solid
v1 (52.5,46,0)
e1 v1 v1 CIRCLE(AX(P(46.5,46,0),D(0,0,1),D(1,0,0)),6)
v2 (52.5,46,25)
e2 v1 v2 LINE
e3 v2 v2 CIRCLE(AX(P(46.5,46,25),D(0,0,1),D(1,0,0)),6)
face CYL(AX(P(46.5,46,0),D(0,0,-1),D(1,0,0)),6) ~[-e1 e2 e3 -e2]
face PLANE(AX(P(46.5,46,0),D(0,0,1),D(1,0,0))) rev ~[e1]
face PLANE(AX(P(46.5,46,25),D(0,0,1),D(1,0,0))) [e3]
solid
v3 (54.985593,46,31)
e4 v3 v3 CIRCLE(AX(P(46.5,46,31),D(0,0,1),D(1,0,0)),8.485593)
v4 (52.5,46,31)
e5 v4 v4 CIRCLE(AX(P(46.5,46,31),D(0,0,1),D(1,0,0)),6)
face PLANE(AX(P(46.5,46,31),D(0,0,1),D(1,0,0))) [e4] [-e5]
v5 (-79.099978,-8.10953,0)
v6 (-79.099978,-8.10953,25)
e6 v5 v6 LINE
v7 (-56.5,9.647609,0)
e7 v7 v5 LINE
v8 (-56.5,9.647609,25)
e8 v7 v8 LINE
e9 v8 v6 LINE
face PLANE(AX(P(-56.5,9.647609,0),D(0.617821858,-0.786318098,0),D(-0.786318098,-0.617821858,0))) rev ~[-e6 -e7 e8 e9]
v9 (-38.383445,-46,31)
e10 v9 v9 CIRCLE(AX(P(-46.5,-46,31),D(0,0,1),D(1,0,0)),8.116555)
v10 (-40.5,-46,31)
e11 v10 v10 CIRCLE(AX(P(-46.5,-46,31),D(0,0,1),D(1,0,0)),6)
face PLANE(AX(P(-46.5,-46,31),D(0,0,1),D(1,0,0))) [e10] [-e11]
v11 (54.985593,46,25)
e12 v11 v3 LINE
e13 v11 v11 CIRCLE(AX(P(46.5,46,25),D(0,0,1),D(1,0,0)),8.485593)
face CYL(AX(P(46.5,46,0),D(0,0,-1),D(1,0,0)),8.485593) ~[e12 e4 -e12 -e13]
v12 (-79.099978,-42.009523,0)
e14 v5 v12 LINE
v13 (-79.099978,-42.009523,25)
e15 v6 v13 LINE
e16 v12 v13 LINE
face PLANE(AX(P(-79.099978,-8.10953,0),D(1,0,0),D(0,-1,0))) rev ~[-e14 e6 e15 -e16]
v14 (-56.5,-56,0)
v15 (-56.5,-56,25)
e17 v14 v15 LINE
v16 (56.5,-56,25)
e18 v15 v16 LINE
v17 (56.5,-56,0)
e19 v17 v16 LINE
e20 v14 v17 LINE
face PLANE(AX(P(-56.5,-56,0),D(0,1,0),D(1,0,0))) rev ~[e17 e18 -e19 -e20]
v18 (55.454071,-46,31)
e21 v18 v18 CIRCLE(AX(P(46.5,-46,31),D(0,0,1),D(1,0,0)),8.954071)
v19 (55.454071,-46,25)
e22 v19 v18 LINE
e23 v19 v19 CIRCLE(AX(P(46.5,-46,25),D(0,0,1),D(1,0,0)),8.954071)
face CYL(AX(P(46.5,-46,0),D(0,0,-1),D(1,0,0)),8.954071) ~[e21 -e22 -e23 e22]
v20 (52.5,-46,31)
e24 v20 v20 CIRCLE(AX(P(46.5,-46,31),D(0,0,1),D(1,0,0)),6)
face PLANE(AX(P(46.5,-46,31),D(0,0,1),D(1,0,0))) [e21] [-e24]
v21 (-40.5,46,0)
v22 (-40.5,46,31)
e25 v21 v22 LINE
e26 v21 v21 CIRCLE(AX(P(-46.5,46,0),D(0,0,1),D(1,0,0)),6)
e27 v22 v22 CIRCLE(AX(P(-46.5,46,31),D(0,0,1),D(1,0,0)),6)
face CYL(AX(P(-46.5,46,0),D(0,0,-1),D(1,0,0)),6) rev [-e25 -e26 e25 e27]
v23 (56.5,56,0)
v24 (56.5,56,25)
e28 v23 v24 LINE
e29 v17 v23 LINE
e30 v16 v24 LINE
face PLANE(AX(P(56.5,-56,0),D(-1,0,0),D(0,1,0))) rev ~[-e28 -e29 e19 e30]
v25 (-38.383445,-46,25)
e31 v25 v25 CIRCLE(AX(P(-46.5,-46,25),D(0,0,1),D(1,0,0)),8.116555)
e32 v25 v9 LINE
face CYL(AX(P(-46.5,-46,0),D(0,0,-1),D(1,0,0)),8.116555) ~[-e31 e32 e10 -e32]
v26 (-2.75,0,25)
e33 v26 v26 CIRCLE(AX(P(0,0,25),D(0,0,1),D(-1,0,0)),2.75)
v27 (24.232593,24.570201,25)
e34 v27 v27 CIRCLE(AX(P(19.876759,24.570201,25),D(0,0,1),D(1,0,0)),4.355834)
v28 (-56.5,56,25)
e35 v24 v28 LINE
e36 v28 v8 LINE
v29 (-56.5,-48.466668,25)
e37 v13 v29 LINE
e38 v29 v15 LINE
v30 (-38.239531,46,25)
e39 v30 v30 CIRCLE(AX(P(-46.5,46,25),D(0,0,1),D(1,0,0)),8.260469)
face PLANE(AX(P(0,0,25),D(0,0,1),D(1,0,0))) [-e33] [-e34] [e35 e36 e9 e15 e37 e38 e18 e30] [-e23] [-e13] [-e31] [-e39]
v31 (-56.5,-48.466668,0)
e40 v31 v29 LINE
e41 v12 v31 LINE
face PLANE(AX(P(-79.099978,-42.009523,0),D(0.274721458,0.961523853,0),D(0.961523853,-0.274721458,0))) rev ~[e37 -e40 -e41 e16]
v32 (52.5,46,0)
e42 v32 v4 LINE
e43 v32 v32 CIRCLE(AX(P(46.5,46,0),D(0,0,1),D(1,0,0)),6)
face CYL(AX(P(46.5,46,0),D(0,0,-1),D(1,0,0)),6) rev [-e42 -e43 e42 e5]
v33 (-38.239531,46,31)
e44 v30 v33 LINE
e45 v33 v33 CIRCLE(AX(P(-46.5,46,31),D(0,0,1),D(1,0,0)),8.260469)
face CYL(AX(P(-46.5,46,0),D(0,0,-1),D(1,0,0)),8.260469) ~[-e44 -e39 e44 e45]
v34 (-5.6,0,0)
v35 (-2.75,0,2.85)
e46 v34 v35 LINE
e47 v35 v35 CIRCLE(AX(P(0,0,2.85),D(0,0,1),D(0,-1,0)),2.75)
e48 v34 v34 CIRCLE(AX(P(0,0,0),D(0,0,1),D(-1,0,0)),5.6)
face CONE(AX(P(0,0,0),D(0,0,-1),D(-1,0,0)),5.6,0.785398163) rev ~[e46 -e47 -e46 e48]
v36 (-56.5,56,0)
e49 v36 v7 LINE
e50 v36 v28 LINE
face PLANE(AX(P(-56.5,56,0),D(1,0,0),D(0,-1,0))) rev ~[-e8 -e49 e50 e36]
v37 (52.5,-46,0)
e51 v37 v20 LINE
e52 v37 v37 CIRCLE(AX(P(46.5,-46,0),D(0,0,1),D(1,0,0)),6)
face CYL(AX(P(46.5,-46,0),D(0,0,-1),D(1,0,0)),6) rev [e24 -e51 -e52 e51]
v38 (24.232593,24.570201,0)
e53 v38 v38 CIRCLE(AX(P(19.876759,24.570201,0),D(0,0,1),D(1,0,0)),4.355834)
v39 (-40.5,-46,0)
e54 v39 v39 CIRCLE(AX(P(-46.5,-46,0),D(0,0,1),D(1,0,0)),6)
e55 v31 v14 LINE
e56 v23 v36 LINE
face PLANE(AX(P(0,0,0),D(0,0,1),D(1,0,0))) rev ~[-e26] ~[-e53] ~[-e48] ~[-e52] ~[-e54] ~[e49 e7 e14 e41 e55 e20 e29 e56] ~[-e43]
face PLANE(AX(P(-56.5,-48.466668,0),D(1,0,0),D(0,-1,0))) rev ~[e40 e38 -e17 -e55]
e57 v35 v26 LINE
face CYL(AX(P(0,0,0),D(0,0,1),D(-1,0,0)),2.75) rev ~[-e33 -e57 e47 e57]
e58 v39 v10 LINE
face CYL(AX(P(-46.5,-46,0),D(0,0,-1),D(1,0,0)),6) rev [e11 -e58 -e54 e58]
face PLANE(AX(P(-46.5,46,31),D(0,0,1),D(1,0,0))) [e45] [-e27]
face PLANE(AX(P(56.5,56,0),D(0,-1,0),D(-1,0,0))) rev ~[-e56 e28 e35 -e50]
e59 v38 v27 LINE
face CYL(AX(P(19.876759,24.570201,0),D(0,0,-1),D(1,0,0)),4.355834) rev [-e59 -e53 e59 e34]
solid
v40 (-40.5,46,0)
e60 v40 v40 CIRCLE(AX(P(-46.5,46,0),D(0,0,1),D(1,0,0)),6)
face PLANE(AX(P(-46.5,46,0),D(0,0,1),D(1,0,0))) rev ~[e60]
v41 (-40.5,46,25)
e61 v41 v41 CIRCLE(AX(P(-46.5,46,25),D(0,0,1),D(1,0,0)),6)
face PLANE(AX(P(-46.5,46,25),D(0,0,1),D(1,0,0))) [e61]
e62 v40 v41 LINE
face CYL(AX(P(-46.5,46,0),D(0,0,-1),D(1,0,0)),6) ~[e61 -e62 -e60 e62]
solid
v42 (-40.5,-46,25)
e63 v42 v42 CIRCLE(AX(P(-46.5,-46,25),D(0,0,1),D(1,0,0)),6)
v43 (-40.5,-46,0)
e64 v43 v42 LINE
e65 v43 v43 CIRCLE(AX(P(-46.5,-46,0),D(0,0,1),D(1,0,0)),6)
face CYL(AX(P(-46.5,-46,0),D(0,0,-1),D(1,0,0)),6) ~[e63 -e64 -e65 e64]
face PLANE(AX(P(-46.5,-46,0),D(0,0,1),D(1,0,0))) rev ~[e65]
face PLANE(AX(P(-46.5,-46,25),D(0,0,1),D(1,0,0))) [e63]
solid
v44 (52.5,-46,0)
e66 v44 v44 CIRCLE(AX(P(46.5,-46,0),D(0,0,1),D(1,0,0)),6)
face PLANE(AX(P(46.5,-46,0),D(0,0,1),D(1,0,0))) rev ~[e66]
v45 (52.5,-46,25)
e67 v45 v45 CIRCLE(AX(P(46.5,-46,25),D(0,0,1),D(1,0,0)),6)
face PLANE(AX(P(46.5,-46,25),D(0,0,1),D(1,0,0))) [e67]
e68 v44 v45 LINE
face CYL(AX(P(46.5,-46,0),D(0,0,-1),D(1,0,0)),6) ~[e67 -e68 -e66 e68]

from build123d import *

# Parameters (mm, degrees)
F0_R           = 8.1165547555
F0_R_2         = 8.9540708035
F0_R_3         = 8.2604689148
F0_R_4         = 8.4855933961
F1_DEPTH       = 25
F0_R_5         = 6
F2_DEPTH       = 31
F3_R           = 4.3558335705
F4_DEPTH       = 25
F5_D           = 5.5
F5_CSINK_D     = 11.2
F5_CSINK_ANGLE = 90


with BuildPart() as f1:
    # F0 (on Top) → F1 (new body)
    with BuildSketch(Plane.XY):
        Polygon((-56.5, -56), (56.5, -56), (56.5, 56), (-56.5, 56), (-56.5, 9.6476091864), (-56.5, -48.4666682311), align=None)
        with Locations((-46.5, -46)):
            Circle(F0_R, mode=Mode.SUBTRACT)
        with Locations((46.5, -46)):
            Circle(F0_R_2, mode=Mode.SUBTRACT)
        with Locations((-46.5, 46)):
            Circle(F0_R_3, mode=Mode.SUBTRACT)
        with Locations((46.5, 46)):
            Circle(F0_R_4, mode=Mode.SUBTRACT)
        Polygon((-79.0999777075, -42.0095233626), (-56.5, -48.4666682311), (-56.5, 9.6476091864), (-79.0999777075, -8.1095304023), align=None)
    extrude(amount=F1_DEPTH)

    # F0 (on Top) → F2 (join)
    with BuildSketch(Plane.XY):
        with Locations((-46.5, -46)):
            Circle(F0_R)
        with Locations((-46.5, -46)):
            Circle(F0_R_5, mode=Mode.SUBTRACT)
        with Locations((46.5, -46)):
            Circle(F0_R_2)
        with Locations((46.5, -46)):
            Circle(F0_R_5, mode=Mode.SUBTRACT)
        with Locations((46.5, 46)):
            Circle(F0_R_4)
        with Locations((46.5, 46)):
            Circle(F0_R_5, mode=Mode.SUBTRACT)
        with Locations((-46.5, 46)):
            Circle(F0_R_3)
        with Locations((-46.5, 46)):
            Circle(F0_R_5, mode=Mode.SUBTRACT)
    extrude(amount=F2_DEPTH)

    # F3 (on Top) → F4 (cut, through all)
    with BuildSketch(Plane.XY):
        with Locations((19.8767594993, 24.5702005923)):
            Circle(F3_R)
    extrude(amount=F4_DEPTH, mode=Mode.SUBTRACT)

    # F5 (through all)
    with Locations(Plane(origin=(0, 0, 0), x_dir=(1, 0, 0), z_dir=(0, 0, -1))):
        with Locations((0, 0)):
            CounterSinkHole(F5_D / 2, F5_CSINK_D / 2, counter_sink_angle=F5_CSINK_ANGLE)


with BuildPart() as f1b:
    # F0 (on Top) → F1, piece 2 (new body)
    with BuildSketch(Plane.XY):
        with Locations((-46.5, 46)):
            Circle(F0_R_5)
    extrude(amount=F1_DEPTH)


with BuildPart() as f1c:
    # F0 (on Top) → F1, piece 3 (new body)
    with BuildSketch(Plane.XY):
        with Locations((46.5, 46)):
            Circle(F0_R_5)
    extrude(amount=F1_DEPTH)


with BuildPart() as f1d:
    # F0 (on Top) → F1, piece 4 (new body)
    with BuildSketch(Plane.XY):
        with Locations((46.5, -46)):
            Circle(F0_R_5)
    extrude(amount=F1_DEPTH)


with BuildPart() as f1e:
    # F0 (on Top) → F1, piece 5 (new body)
    with BuildSketch(Plane.XY):
        with Locations((-46.5, -46)):
            Circle(F0_R_5)
    extrude(amount=F1_DEPTH)


solid = Compound([f1.part, f1b.part, f1c.part, f1d.part, f1e.part])
